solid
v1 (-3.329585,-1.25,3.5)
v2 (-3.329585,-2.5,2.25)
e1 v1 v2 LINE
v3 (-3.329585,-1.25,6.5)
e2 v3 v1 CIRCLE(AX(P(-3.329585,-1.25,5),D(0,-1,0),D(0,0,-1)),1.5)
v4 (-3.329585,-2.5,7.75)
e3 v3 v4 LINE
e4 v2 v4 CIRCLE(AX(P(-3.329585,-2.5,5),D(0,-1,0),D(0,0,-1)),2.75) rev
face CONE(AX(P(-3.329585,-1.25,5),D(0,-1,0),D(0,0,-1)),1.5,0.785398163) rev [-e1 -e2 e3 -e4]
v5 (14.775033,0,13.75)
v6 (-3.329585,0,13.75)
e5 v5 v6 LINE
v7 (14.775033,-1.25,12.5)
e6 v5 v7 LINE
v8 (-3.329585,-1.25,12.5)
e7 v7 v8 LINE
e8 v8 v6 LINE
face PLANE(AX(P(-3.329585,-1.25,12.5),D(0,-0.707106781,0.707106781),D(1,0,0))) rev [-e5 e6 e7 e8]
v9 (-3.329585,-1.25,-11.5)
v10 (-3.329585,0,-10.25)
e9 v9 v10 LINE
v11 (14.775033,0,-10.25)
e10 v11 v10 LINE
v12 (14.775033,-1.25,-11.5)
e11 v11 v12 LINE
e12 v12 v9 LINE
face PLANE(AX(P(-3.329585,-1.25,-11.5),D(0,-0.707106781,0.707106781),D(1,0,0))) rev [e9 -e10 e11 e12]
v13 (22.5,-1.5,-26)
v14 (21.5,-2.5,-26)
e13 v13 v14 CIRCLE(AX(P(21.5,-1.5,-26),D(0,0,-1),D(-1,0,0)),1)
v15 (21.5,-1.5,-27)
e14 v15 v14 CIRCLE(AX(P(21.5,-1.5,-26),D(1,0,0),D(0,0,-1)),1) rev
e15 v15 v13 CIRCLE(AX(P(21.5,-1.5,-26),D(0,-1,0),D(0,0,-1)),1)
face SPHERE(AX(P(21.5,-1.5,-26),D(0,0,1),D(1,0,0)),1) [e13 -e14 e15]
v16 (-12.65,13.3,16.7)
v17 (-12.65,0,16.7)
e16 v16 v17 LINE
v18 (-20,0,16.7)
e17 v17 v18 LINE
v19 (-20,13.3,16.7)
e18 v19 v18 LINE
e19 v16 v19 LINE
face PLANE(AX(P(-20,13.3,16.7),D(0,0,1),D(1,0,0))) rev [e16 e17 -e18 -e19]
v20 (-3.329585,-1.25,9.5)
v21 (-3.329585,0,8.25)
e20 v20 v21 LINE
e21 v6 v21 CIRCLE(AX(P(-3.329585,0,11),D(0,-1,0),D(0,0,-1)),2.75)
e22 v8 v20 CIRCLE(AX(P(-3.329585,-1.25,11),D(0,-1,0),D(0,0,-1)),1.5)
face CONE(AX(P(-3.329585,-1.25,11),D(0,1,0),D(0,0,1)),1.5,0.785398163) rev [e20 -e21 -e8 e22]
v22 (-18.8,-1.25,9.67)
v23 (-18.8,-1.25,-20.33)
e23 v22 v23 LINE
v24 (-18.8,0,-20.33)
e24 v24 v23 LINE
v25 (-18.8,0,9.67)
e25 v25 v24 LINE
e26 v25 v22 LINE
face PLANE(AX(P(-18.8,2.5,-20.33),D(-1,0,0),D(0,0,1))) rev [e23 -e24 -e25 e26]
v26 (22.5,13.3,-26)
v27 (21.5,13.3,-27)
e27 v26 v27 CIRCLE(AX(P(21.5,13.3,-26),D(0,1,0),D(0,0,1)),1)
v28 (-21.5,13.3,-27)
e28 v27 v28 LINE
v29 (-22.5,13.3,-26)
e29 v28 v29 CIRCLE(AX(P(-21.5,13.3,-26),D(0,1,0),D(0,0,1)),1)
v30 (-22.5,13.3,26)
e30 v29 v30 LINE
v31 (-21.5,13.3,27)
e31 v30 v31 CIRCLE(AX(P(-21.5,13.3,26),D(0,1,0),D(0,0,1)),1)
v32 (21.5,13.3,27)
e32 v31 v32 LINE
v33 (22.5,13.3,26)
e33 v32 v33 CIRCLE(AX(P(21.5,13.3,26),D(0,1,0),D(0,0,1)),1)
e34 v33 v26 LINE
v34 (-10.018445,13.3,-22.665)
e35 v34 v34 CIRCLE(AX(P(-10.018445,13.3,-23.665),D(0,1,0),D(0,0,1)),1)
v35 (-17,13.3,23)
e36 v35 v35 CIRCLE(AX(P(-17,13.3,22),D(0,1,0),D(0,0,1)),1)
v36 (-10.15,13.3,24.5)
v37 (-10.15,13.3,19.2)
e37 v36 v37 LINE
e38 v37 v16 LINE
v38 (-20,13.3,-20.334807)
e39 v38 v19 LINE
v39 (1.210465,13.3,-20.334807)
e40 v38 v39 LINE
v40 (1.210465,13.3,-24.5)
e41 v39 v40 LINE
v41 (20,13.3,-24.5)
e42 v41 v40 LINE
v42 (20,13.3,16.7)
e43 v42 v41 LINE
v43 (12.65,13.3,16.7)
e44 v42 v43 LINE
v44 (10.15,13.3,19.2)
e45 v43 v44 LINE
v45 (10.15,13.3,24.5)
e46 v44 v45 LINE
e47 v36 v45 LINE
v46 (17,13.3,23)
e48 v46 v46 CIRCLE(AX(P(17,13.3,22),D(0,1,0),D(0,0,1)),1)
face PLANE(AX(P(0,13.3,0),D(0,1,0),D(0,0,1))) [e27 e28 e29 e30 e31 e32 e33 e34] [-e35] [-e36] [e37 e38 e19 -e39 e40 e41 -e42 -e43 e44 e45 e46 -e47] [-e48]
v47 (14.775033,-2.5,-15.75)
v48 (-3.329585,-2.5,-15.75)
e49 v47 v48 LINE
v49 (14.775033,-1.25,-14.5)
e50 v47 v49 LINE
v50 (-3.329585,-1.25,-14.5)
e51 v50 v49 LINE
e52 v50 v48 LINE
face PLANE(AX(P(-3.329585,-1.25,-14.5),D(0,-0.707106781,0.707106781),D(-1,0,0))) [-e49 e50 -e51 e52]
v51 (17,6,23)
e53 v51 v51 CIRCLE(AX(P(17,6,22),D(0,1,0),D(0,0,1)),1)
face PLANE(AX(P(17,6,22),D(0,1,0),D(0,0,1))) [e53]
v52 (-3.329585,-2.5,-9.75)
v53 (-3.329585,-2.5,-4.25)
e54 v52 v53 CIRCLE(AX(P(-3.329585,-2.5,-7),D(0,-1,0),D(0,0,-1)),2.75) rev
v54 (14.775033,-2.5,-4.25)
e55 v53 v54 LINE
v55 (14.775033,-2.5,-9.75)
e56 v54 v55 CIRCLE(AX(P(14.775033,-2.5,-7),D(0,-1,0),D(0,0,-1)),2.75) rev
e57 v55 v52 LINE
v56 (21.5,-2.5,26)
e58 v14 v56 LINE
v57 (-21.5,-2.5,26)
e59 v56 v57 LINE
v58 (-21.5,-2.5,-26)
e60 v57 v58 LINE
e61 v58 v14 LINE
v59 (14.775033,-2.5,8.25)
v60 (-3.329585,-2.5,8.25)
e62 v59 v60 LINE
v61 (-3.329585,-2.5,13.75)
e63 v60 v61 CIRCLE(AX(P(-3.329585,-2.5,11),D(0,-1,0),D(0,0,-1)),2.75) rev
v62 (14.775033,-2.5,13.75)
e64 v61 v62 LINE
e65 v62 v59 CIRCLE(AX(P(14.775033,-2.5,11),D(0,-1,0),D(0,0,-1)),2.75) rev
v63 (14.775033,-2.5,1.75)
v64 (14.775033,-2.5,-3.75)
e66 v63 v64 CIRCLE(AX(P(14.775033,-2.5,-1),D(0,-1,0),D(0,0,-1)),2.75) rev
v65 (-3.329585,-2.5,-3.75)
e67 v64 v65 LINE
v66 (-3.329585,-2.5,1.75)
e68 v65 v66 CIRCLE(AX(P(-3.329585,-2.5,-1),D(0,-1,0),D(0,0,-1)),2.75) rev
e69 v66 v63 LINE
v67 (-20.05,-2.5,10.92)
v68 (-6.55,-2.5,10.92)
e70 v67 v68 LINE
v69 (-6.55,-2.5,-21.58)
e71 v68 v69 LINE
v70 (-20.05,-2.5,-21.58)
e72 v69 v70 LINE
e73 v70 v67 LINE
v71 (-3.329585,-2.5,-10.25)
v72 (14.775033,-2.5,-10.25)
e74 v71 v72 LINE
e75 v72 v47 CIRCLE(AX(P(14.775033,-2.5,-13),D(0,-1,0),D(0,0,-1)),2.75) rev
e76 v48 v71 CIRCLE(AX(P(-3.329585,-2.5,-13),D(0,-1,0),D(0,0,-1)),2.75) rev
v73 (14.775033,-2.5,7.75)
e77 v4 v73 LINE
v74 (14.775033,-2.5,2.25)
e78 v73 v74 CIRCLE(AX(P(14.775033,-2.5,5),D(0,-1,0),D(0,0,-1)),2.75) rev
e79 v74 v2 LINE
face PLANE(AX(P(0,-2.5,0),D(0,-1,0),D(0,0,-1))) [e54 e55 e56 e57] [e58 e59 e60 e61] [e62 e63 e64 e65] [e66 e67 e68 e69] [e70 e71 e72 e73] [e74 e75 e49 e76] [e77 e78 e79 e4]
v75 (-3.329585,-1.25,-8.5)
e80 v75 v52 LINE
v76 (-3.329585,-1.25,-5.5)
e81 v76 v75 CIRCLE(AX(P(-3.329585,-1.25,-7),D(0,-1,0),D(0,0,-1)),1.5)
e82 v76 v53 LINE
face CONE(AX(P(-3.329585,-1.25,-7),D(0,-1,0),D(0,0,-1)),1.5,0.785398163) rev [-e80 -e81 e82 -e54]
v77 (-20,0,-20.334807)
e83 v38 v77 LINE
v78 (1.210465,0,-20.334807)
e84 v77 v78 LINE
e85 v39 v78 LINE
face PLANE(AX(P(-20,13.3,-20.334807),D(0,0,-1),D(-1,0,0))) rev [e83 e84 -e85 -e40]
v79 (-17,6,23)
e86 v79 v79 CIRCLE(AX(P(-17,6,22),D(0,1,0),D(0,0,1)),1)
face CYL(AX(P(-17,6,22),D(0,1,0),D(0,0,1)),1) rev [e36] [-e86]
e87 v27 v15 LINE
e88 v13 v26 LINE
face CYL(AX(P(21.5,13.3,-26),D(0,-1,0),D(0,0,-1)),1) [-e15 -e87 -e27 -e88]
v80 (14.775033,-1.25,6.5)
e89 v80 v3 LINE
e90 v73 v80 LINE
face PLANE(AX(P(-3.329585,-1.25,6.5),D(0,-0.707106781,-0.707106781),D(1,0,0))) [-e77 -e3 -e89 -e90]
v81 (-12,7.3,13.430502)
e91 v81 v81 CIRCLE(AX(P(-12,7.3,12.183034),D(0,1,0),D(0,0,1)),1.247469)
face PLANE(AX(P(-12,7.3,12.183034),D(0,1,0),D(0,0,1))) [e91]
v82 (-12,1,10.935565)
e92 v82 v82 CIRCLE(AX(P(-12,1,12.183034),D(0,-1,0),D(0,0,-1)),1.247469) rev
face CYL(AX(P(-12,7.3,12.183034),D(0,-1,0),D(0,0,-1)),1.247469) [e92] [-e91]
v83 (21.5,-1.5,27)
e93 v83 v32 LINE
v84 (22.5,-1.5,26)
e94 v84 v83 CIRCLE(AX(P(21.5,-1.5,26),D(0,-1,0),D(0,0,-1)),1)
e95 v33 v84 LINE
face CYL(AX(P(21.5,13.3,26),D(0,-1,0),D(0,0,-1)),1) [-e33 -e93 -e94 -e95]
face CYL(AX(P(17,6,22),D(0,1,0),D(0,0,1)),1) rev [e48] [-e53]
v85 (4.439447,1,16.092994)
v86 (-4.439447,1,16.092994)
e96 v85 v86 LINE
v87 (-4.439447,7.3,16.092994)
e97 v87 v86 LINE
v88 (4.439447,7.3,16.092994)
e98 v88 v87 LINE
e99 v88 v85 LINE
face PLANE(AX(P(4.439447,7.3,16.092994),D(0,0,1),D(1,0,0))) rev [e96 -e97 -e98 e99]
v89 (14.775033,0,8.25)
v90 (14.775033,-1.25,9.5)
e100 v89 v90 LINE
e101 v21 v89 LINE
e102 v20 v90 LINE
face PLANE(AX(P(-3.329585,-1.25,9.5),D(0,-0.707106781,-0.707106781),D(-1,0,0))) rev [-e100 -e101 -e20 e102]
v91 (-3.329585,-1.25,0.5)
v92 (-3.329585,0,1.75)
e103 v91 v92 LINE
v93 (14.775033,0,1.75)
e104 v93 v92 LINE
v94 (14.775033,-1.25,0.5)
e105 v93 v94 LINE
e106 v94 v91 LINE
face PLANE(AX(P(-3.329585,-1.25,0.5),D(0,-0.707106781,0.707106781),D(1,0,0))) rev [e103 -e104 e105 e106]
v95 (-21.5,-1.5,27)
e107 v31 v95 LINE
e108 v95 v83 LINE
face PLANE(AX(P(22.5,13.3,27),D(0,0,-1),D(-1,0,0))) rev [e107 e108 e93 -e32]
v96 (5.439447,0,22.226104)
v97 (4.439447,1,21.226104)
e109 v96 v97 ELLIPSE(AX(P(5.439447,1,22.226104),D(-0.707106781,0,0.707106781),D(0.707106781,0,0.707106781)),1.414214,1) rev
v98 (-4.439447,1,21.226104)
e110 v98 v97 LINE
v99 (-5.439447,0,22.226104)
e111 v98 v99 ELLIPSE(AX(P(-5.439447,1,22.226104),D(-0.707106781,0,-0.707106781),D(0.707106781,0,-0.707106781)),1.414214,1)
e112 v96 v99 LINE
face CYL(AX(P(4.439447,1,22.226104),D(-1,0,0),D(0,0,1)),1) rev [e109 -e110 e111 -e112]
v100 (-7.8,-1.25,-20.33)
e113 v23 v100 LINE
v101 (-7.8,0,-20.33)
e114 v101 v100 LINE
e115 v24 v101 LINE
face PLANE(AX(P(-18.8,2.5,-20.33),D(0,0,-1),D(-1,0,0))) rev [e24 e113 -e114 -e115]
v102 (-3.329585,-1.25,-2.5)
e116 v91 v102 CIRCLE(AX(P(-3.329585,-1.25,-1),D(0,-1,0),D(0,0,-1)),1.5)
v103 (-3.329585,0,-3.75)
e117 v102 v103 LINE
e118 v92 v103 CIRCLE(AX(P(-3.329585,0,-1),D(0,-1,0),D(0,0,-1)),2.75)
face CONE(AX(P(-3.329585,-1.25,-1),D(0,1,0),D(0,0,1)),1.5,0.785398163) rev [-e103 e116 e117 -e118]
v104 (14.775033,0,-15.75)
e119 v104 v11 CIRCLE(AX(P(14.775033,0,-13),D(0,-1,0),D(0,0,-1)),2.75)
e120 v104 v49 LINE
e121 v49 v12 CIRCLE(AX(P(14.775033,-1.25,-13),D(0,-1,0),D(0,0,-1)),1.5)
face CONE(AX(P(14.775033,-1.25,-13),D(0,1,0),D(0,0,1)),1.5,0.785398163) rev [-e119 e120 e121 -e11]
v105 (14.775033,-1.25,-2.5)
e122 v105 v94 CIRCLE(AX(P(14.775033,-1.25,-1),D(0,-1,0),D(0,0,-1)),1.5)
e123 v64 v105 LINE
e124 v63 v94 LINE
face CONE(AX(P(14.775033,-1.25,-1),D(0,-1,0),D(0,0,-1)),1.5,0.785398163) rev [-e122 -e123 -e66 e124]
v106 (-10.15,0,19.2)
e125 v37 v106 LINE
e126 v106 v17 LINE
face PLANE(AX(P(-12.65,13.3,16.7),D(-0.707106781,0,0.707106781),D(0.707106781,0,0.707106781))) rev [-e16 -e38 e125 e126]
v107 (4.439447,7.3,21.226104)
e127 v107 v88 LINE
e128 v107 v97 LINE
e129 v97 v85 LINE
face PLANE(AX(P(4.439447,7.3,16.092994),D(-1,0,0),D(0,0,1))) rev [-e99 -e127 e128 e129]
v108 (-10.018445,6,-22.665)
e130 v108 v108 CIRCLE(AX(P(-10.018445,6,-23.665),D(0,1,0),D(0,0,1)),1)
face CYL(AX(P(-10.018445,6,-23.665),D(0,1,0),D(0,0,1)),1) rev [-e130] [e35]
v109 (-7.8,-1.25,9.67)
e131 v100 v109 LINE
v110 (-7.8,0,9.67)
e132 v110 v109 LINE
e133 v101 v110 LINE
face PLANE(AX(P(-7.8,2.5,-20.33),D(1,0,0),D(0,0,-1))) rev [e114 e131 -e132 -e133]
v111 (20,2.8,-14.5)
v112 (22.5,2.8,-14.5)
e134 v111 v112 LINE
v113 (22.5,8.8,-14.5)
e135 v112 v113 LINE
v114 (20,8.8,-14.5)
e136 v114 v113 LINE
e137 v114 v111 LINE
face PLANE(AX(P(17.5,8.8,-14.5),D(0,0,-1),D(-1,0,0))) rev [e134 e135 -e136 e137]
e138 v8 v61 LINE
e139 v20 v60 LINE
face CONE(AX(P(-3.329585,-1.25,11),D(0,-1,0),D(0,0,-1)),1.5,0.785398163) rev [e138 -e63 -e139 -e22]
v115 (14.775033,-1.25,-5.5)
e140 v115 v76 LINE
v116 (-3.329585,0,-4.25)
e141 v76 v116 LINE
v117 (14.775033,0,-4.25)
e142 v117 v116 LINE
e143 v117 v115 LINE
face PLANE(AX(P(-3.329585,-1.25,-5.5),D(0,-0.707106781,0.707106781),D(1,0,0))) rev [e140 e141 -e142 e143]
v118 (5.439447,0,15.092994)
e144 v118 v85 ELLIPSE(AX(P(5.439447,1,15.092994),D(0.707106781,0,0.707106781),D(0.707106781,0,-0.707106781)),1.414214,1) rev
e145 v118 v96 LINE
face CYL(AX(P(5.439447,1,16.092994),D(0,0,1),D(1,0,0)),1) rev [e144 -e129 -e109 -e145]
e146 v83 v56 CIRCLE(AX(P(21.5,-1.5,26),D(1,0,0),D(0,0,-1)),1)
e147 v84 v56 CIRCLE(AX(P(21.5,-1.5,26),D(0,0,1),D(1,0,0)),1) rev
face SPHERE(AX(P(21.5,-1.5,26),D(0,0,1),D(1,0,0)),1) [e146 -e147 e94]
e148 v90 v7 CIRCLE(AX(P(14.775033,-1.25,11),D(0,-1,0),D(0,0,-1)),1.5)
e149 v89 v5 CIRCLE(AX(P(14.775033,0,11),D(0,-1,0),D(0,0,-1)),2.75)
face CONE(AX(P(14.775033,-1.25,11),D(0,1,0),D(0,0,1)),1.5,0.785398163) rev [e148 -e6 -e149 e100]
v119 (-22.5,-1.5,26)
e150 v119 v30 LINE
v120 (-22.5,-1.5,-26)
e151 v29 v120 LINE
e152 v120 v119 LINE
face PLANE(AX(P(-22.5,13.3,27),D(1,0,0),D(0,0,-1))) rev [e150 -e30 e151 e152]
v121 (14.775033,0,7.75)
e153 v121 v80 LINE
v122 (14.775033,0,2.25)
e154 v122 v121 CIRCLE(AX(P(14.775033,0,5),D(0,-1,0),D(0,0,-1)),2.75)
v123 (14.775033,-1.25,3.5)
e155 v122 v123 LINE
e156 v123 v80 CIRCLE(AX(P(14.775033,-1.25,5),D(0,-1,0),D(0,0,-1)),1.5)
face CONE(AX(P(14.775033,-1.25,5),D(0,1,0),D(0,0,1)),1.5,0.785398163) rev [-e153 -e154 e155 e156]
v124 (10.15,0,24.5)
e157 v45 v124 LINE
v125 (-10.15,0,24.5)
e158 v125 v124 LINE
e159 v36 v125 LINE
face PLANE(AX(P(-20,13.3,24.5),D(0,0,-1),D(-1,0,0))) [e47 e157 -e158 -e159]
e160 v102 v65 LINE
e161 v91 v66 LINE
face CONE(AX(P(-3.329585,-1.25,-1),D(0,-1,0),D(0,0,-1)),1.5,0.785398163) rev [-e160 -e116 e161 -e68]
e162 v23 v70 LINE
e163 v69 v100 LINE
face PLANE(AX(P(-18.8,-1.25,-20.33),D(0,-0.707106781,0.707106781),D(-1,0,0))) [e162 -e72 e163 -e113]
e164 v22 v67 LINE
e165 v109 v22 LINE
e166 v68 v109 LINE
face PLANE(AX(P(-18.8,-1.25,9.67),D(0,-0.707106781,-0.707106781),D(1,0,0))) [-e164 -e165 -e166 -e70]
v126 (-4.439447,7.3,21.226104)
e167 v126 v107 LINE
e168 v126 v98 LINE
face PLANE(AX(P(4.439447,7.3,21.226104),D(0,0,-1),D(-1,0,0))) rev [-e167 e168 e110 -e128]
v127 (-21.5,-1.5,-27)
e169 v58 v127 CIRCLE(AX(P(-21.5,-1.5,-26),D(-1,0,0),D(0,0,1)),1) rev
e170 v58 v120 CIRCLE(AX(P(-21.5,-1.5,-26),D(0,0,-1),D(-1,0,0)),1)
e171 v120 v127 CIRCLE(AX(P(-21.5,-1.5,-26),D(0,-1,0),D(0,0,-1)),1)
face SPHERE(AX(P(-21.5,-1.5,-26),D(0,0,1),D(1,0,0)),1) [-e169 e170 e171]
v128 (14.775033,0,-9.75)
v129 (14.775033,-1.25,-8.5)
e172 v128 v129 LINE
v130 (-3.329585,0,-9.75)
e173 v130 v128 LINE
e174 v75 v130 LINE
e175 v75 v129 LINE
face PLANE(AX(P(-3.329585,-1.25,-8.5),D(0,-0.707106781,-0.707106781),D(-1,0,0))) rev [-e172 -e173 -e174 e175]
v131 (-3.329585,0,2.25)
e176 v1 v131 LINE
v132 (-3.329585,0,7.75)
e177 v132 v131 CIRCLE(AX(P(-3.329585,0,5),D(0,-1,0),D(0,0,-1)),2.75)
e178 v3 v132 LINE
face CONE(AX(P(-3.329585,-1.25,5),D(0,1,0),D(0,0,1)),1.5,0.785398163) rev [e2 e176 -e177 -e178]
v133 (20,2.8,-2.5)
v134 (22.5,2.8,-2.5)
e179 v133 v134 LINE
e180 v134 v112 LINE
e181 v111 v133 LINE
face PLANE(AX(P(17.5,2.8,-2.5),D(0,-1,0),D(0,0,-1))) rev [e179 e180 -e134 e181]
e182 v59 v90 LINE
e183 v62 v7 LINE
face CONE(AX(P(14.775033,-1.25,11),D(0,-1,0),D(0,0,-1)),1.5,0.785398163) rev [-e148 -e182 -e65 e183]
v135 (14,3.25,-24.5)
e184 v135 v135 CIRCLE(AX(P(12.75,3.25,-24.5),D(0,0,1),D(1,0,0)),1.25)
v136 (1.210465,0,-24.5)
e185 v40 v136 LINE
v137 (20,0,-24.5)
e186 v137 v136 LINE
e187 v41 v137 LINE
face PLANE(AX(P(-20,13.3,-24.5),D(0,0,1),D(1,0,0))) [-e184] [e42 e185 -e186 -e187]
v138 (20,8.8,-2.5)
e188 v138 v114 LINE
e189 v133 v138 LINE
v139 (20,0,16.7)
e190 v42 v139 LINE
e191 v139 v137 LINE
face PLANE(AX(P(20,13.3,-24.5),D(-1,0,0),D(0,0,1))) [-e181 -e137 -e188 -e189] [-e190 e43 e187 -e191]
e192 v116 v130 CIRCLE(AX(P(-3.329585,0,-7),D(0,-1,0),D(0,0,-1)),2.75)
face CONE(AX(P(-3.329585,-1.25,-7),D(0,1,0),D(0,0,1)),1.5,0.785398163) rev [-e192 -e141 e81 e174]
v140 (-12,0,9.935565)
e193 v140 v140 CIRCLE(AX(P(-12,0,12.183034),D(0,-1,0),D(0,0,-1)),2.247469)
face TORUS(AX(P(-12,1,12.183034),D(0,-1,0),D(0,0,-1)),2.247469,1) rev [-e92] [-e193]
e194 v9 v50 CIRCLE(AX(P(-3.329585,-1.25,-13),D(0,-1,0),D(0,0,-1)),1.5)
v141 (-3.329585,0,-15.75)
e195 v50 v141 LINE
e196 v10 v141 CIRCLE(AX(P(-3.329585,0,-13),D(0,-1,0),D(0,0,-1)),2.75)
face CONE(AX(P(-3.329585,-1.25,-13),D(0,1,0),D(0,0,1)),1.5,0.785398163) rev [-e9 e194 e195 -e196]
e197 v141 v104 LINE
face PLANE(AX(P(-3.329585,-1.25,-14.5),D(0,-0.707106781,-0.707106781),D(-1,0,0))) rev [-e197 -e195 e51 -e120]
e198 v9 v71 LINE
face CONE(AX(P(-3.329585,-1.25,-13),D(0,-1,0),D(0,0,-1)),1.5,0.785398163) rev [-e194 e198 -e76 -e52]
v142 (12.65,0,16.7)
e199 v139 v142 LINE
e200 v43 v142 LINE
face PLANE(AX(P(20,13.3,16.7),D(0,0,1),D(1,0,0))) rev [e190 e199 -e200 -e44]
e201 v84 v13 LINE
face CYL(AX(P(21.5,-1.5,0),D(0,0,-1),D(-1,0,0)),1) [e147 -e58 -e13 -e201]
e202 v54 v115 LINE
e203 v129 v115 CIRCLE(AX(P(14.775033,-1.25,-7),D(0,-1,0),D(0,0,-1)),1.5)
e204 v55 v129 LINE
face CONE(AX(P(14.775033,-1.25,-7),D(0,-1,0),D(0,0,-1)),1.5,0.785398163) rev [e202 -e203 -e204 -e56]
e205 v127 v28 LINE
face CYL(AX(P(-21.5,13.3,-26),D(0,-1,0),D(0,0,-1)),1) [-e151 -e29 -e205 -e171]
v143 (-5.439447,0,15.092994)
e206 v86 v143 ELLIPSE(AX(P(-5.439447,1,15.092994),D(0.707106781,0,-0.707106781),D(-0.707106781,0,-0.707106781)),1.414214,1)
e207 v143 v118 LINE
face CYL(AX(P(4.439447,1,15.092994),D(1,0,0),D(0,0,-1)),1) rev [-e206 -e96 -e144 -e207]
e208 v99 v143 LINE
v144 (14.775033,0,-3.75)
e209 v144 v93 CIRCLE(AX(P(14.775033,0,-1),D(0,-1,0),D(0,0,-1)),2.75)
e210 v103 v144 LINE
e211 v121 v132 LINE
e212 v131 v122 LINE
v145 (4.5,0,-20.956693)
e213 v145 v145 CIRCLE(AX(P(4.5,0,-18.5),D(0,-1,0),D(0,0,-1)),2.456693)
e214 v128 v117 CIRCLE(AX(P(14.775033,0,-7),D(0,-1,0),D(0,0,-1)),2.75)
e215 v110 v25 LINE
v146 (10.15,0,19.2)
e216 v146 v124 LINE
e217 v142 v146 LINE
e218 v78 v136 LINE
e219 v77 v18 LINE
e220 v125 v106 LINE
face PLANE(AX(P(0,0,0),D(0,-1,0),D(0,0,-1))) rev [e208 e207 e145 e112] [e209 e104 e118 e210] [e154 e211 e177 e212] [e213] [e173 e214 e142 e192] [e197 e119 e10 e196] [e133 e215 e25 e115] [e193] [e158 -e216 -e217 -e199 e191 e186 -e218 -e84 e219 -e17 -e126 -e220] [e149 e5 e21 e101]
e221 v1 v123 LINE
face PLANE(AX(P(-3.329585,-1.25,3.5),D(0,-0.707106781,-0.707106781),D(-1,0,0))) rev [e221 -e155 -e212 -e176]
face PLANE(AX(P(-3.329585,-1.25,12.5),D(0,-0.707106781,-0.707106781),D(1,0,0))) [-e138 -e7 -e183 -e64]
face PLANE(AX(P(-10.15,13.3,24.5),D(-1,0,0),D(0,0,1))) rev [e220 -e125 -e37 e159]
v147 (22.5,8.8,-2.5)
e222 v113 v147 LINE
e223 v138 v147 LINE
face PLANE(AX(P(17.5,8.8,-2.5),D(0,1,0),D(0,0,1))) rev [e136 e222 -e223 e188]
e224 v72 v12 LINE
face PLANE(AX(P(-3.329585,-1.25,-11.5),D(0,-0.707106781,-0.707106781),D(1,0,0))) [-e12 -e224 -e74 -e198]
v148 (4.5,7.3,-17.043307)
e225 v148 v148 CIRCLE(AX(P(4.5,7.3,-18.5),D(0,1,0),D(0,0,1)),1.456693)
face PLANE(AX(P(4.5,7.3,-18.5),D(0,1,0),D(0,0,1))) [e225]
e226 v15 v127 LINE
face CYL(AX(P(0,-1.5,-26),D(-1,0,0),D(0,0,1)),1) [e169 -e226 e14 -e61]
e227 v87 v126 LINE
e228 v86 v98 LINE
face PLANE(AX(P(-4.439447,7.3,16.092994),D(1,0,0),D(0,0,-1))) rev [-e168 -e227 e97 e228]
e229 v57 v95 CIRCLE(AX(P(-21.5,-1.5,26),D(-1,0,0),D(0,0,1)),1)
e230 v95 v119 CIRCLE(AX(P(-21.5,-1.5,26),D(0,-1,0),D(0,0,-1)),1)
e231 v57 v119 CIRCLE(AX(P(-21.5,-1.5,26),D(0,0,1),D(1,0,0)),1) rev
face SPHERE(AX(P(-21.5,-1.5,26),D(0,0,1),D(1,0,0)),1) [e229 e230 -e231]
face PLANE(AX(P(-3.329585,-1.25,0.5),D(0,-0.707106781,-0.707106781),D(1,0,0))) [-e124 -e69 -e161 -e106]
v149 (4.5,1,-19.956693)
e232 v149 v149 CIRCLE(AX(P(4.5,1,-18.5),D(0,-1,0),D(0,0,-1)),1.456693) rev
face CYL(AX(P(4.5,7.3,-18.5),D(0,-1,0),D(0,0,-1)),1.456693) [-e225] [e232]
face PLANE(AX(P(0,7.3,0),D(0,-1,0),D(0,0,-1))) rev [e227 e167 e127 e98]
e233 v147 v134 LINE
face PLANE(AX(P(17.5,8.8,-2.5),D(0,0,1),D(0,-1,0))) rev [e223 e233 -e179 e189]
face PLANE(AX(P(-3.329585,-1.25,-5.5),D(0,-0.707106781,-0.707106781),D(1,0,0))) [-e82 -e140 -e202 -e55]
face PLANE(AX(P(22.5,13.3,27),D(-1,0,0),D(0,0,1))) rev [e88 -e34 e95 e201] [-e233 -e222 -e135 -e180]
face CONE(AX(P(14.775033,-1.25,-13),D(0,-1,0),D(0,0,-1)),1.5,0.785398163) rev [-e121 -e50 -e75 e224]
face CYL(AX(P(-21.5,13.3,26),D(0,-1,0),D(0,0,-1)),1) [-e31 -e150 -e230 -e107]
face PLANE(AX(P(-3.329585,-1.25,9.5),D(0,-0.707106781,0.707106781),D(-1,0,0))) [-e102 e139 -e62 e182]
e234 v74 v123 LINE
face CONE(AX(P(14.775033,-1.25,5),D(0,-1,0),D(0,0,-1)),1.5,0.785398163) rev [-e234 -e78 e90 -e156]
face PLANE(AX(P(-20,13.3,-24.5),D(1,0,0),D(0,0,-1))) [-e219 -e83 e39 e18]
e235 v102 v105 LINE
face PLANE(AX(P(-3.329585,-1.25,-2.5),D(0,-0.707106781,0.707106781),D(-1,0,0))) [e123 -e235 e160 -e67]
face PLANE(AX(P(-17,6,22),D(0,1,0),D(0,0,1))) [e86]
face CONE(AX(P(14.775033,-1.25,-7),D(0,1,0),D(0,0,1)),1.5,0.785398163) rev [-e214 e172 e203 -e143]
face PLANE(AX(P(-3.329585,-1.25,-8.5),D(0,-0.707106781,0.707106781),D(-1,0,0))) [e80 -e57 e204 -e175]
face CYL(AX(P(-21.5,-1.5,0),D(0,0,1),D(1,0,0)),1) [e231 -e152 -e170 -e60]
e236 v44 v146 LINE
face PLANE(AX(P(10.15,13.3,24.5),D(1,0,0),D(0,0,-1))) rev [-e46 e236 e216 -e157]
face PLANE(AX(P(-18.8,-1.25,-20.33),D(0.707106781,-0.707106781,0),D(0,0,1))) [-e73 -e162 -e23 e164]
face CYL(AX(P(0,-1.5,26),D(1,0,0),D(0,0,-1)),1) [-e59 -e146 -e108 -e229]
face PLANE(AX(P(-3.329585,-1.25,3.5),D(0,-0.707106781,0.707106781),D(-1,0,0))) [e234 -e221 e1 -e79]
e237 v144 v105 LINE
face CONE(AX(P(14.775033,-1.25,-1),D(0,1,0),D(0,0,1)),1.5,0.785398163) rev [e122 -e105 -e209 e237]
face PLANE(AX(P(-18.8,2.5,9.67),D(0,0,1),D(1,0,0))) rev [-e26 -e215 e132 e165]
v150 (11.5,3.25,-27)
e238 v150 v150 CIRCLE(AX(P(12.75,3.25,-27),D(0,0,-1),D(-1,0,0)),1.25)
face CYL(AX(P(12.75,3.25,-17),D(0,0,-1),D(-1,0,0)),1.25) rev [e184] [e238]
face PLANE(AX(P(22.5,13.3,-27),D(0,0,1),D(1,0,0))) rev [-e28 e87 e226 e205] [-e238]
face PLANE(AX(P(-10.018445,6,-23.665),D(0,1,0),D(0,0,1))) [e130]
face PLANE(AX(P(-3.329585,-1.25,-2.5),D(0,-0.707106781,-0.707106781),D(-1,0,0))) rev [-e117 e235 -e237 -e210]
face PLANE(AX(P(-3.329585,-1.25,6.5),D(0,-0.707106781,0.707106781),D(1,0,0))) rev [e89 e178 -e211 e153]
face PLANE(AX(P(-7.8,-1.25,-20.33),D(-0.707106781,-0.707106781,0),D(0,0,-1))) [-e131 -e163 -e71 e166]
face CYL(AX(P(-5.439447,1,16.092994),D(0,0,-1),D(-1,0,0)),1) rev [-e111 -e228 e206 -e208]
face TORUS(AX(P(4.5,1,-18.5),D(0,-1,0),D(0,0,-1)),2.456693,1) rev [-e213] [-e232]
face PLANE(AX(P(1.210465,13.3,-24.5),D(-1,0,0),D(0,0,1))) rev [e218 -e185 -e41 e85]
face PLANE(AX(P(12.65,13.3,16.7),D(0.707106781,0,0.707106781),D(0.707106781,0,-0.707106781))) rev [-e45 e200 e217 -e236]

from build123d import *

# Parameters (mm, degrees)
SKETCH1_W           = 45
SKETCH1_H           = 54
SKETCH1_W_2         = 40
SKETCH1_H_2         = 49
BOSS_EXTRUDE1_DEPTH = 13.3
SKETCH3_W           = 45
SKETCH3_H           = 54
BOSS_EXTRUDE2_DEPTH = 2.5
BOSS_EXTRUDE4_DEPTH = 13.3
SKETCH5_W           = 11
SKETCH5_H           = 30
CUT_EXTRUDE1_DEPTH  = 5
SKETCH6_W           = 12
SKETCH6_H           = 6
CUT_EXTRUDE2_DEPTH  = 5
SKETCH7_R           = 1.456693422
SKETCH7_R_2         = 1.2474688
SKETCH7_W           = 8.87889324
SKETCH7_H           = 5.133110155
BOSS_EXTRUDE5_DEPTH = 7.3
FILLET1_R           = 1
CUT_EXTRUDE3_DEPTH  = 7.3
FILLET2_R           = 1
CHAMFER2_SIZE       = 1.25
CHAMFER3_SIZE       = 1.25
CHAMFER4_SIZE       = 1.25
SKETCH9_W           = 21.210465444
SKETCH9_H           = 4.165192571
BOSS_EXTRUDE6_DEPTH = 13.3
SKETCH10_R          = 1
CUT_EXTRUDE4_DEPTH  = 7.3
SKETCH11_R          = 1.25
CUT_EXTRUDE5_DEPTH  = 10


with BuildPart() as part:
    # Sketch1 → Boss-Extrude1 (new body)
    with BuildSketch(Plane(origin=(0, 0, 0), x_dir=(1, 0, 0), z_dir=(0, 1, 0))):
        Rectangle(SKETCH1_W, SKETCH1_H)
        Rectangle(SKETCH1_W_2, SKETCH1_H_2, mode=Mode.SUBTRACT)
    extrude(amount=BOSS_EXTRUDE1_DEPTH)

    # Sketch3 → Boss-Extrude2 (add)
    with BuildSketch(Plane.XZ):
        Rectangle(SKETCH3_W, SKETCH3_H)
    extrude(amount=BOSS_EXTRUDE2_DEPTH)

    # Sketch4 → Boss-Extrude4 (add, through all)
    with BuildSketch(Plane(origin=(0, 0, 0), x_dir=(1, 0, 0), z_dir=(0, 1, 0))):
        Polygon((-12.65, -16.7), (-10.15, -19.2), (-10.15, -24.5), (-20, -24.5), (-20, -16.7), align=None)
        Polygon((12.65, -16.7), (10.15, -19.2), (10.15, -24.5), (20, -24.5), (20, -16.7), align=None)
    extrude(amount=BOSS_EXTRUDE4_DEPTH)

    # Sketch5 → Cut-Extrude1 (cut)
    with BuildSketch(Plane.XZ.offset(2.5)):
        with Locations((-13.3, -5.33)):
            Rectangle(SKETCH5_W, SKETCH5_H)
    extrude(amount=-CUT_EXTRUDE1_DEPTH, mode=Mode.SUBTRACT)

    # Sketch6 → Cut-Extrude2 (cut)
    with BuildSketch(Plane(origin=(22.5, 0, 0), x_dir=(0, 0, -1), z_dir=(1, 0, 0))):
        with Locations((8.5, 5.8)):
            Rectangle(SKETCH6_W, SKETCH6_H)
    extrude(amount=-CUT_EXTRUDE2_DEPTH, mode=Mode.SUBTRACT)

    # Sketch7 → Boss-Extrude5 (add)
    with BuildSketch(Plane(origin=(0, 0, 0), x_dir=(1, 0, 0), z_dir=(0, 1, 0))):
        with Locations(Location((4.5, 18.5, 0), (0, 0, 90))):
            Circle(SKETCH7_R)
        with Locations(Location((-12, -12.183033551, 0), (0, 0, 90))):
            Circle(SKETCH7_R_2)
        with Locations((0, -18.659549076)):
            Rectangle(SKETCH7_W, SKETCH7_H)
    extrude(amount=BOSS_EXTRUDE5_DEPTH)

    # Fillet1
    fillet1_edges = [part.edges().sort_by_distance(p)[0] for p in [
        (-22.5, -2.5, 0),
        (0, -2.5, -27),
        (22.5, -2.5, 0),
        (0, -2.5, 27),
        (-22.5, 5.4, -27),
        (22.5, 5.4, -27),
        (22.5, 5.4, 27),
        (-22.5, 5.4, 27),
    ]]
    fillet(fillet1_edges, radius=FILLET1_R)

    # Sketch8 → Cut-Extrude3 (cut)
    with BuildSketch(Plane(origin=(0, 0, 0), x_dir=(1, 0, 0), z_dir=(0, 1, 0))):
        with BuildLine():
            Line((-3.329584965, 14.5), (14.775033283, 14.5))
            ThreePointArc((14.775033283, 14.5), (16.275033283, 13), (14.775033283, 11.5))
            Line((14.775033283, 11.5), (-3.329584965, 11.5))
            ThreePointArc((-3.329584965, 11.5), (-4.829584965, 13), (-3.329584965, 14.5))
        make_face()
        with BuildLine():
            Line((-3.329584965, 8.5), (14.775033283, 8.5))
            ThreePointArc((14.775033283, 8.5), (16.275033283, 7), (14.775033283, 5.5))
            Line((14.775033283, 5.5), (-3.329584965, 5.5))
            ThreePointArc((-3.329584965, 5.5), (-4.829584965, 7), (-3.329584965, 8.5))
        make_face()
        with BuildLine():
            Line((-3.329584965, 2.5), (14.775033283, 2.5))
            ThreePointArc((14.775033283, 2.5), (16.275033283, 1), (14.775033283, -0.5))
            Line((14.775033283, -0.5), (-3.329584965, -0.5))
            ThreePointArc((-3.329584965, -0.5), (-4.829584965, 1), (-3.329584965, 2.5))
        make_face()
        with BuildLine():
            Line((-3.329584965, -3.5), (14.775033283, -3.5))
            ThreePointArc((14.775033283, -3.5), (16.275033283, -5), (14.775033283, -6.5))
            Line((14.775033283, -6.5), (-3.329584965, -6.5))
            ThreePointArc((-3.329584965, -6.5), (-4.829584965, -5), (-3.329584965, -3.5))
        make_face()
        with BuildLine():
            Line((-3.329584965, -9.5), (14.775033283, -9.5))
            ThreePointArc((14.775033283, -9.5), (16.275033283, -11), (14.775033283, -12.5))
            Line((14.775033283, -12.5), (-3.329584965, -12.5))
            ThreePointArc((-3.329584965, -12.5), (-4.829584965, -11), (-3.329584965, -9.5))
        make_face()
    extrude(amount=-CUT_EXTRUDE3_DEPTH, mode=Mode.SUBTRACT)

    # Fillet2
    fillet2_edges = [part.edges().sort_by_distance(p)[0] for p in [
        (-4.43944662, 0, 18.659549076),
        (0, 0, 21.226104153),
        (4.43944662, 0, 18.659549076),
        (0, 0, 16.092993998),
        (4.5, 0, -17.043306578),
        (-12, 0, 13.430502351),
    ]]
    fillet(fillet2_edges, radius=FILLET2_R)

    # Chamfer2
    chamfer2_edges = [part.edges().sort_by_distance(p)[0] for p in [
        (5.722724159, -2.5, -11.5),
        (16.275033283, -2.5, -13),
        (5.722724159, -2.5, -14.5),
        (-4.829584965, -2.5, -13),
        (5.722724159, -2.5, -5.5),
        (16.275033283, -2.5, -7),
        (5.722724159, -2.5, -8.5),
        (-4.829584965, -2.5, -7),
        (5.722724159, -2.5, 0.5),
        (16.275033283, -2.5, -1),
        (5.722724159, -2.5, -2.5),
        (-4.829584965, -2.5, -1),
        (5.722724159, -2.5, 6.5),
        (16.275033283, -2.5, 5),
        (5.722724159, -2.5, 3.5),
        (-4.829584965, -2.5, 5),
        (5.722724159, -2.5, 12.5),
        (16.275033283, -2.5, 11),
        (5.722724159, -2.5, 9.5),
        (-4.829584965, -2.5, 11),
    ]]
    chamfer(chamfer2_edges, length=CHAMFER2_SIZE)

    # Chamfer3
    chamfer3_edges = [part.edges().sort_by_distance(p)[0] for p in [
        (5.722724159, 0, 12.5),
        (16.275033283, 0, 11),
        (-4.829584965, 0, 11),
        (5.722724159, 0, 9.5),
        (5.722724159, 0, 6.5),
        (16.275033283, 0, 5),
        (-4.829584965, 0, 5),
        (5.722724159, 0, 3.5),
        (5.722724159, 0, 0.5),
        (16.275033283, 0, -1),
        (-4.829584965, 0, -1),
        (5.722724159, 0, -2.5),
        (5.722724159, 0, -5.5),
        (16.275033283, 0, -7),
        (-4.829584965, 0, -7),
        (5.722724159, 0, -8.5),
        (5.722724159, 0, -11.5),
        (16.275033283, 0, -13),
        (-4.829584965, 0, -13),
        (5.722724159, 0, -14.5),
    ]]
    chamfer(chamfer3_edges, length=CHAMFER3_SIZE - 0.0001)  # a hair under: the kernel refuses the full size

    # Chamfer4
    chamfer4_edges = [part.edges().sort_by_distance(p)[0] for p in [
        (-18.8, -2.5, -5.33),
        (-13.3, -2.5, -20.33),
        (-7.8, -2.5, -5.33),
        (-13.3, -2.5, 9.67),
    ]]
    chamfer(chamfer4_edges, length=CHAMFER4_SIZE)

    # Sketch9 → Boss-Extrude6 (add, through all)
    with BuildSketch(Plane(origin=(0, 0, 0), x_dir=(1, 0, 0), z_dir=(0, 1, 0))):
        with Locations((-9.394767278, 22.417403715)):
            Rectangle(SKETCH9_W, SKETCH9_H)
    extrude(amount=BOSS_EXTRUDE6_DEPTH)

    # Sketch10 → Cut-Extrude4 (cut)
    with BuildSketch(Plane(origin=(0, 13.3, 0), x_dir=(1, 0, 0), z_dir=(0, 1, 0))):
        with Locations(Location((-10.018444645, 23.665, 0), (0, 0, 270))):
            Circle(SKETCH10_R)
        with Locations(Location((-17, -22, 0), (0, 0, 270))):
            Circle(SKETCH10_R)
        with Locations(Location((17, -22, 0), (0, 0, 270))):
            Circle(SKETCH10_R)
    extrude(amount=-CUT_EXTRUDE4_DEPTH, mode=Mode.SUBTRACT)

    # Sketch11 → Cut-Extrude5 (cut)
    with BuildSketch(Plane(origin=(0, 0, -27), x_dir=(-1, 0, 0), z_dir=(0, 0, -1))):
        with Locations((-12.75, 3.25)):
            Circle(SKETCH11_R)
    extrude(amount=-CUT_EXTRUDE5_DEPTH, mode=Mode.SUBTRACT)


solid = part.part
